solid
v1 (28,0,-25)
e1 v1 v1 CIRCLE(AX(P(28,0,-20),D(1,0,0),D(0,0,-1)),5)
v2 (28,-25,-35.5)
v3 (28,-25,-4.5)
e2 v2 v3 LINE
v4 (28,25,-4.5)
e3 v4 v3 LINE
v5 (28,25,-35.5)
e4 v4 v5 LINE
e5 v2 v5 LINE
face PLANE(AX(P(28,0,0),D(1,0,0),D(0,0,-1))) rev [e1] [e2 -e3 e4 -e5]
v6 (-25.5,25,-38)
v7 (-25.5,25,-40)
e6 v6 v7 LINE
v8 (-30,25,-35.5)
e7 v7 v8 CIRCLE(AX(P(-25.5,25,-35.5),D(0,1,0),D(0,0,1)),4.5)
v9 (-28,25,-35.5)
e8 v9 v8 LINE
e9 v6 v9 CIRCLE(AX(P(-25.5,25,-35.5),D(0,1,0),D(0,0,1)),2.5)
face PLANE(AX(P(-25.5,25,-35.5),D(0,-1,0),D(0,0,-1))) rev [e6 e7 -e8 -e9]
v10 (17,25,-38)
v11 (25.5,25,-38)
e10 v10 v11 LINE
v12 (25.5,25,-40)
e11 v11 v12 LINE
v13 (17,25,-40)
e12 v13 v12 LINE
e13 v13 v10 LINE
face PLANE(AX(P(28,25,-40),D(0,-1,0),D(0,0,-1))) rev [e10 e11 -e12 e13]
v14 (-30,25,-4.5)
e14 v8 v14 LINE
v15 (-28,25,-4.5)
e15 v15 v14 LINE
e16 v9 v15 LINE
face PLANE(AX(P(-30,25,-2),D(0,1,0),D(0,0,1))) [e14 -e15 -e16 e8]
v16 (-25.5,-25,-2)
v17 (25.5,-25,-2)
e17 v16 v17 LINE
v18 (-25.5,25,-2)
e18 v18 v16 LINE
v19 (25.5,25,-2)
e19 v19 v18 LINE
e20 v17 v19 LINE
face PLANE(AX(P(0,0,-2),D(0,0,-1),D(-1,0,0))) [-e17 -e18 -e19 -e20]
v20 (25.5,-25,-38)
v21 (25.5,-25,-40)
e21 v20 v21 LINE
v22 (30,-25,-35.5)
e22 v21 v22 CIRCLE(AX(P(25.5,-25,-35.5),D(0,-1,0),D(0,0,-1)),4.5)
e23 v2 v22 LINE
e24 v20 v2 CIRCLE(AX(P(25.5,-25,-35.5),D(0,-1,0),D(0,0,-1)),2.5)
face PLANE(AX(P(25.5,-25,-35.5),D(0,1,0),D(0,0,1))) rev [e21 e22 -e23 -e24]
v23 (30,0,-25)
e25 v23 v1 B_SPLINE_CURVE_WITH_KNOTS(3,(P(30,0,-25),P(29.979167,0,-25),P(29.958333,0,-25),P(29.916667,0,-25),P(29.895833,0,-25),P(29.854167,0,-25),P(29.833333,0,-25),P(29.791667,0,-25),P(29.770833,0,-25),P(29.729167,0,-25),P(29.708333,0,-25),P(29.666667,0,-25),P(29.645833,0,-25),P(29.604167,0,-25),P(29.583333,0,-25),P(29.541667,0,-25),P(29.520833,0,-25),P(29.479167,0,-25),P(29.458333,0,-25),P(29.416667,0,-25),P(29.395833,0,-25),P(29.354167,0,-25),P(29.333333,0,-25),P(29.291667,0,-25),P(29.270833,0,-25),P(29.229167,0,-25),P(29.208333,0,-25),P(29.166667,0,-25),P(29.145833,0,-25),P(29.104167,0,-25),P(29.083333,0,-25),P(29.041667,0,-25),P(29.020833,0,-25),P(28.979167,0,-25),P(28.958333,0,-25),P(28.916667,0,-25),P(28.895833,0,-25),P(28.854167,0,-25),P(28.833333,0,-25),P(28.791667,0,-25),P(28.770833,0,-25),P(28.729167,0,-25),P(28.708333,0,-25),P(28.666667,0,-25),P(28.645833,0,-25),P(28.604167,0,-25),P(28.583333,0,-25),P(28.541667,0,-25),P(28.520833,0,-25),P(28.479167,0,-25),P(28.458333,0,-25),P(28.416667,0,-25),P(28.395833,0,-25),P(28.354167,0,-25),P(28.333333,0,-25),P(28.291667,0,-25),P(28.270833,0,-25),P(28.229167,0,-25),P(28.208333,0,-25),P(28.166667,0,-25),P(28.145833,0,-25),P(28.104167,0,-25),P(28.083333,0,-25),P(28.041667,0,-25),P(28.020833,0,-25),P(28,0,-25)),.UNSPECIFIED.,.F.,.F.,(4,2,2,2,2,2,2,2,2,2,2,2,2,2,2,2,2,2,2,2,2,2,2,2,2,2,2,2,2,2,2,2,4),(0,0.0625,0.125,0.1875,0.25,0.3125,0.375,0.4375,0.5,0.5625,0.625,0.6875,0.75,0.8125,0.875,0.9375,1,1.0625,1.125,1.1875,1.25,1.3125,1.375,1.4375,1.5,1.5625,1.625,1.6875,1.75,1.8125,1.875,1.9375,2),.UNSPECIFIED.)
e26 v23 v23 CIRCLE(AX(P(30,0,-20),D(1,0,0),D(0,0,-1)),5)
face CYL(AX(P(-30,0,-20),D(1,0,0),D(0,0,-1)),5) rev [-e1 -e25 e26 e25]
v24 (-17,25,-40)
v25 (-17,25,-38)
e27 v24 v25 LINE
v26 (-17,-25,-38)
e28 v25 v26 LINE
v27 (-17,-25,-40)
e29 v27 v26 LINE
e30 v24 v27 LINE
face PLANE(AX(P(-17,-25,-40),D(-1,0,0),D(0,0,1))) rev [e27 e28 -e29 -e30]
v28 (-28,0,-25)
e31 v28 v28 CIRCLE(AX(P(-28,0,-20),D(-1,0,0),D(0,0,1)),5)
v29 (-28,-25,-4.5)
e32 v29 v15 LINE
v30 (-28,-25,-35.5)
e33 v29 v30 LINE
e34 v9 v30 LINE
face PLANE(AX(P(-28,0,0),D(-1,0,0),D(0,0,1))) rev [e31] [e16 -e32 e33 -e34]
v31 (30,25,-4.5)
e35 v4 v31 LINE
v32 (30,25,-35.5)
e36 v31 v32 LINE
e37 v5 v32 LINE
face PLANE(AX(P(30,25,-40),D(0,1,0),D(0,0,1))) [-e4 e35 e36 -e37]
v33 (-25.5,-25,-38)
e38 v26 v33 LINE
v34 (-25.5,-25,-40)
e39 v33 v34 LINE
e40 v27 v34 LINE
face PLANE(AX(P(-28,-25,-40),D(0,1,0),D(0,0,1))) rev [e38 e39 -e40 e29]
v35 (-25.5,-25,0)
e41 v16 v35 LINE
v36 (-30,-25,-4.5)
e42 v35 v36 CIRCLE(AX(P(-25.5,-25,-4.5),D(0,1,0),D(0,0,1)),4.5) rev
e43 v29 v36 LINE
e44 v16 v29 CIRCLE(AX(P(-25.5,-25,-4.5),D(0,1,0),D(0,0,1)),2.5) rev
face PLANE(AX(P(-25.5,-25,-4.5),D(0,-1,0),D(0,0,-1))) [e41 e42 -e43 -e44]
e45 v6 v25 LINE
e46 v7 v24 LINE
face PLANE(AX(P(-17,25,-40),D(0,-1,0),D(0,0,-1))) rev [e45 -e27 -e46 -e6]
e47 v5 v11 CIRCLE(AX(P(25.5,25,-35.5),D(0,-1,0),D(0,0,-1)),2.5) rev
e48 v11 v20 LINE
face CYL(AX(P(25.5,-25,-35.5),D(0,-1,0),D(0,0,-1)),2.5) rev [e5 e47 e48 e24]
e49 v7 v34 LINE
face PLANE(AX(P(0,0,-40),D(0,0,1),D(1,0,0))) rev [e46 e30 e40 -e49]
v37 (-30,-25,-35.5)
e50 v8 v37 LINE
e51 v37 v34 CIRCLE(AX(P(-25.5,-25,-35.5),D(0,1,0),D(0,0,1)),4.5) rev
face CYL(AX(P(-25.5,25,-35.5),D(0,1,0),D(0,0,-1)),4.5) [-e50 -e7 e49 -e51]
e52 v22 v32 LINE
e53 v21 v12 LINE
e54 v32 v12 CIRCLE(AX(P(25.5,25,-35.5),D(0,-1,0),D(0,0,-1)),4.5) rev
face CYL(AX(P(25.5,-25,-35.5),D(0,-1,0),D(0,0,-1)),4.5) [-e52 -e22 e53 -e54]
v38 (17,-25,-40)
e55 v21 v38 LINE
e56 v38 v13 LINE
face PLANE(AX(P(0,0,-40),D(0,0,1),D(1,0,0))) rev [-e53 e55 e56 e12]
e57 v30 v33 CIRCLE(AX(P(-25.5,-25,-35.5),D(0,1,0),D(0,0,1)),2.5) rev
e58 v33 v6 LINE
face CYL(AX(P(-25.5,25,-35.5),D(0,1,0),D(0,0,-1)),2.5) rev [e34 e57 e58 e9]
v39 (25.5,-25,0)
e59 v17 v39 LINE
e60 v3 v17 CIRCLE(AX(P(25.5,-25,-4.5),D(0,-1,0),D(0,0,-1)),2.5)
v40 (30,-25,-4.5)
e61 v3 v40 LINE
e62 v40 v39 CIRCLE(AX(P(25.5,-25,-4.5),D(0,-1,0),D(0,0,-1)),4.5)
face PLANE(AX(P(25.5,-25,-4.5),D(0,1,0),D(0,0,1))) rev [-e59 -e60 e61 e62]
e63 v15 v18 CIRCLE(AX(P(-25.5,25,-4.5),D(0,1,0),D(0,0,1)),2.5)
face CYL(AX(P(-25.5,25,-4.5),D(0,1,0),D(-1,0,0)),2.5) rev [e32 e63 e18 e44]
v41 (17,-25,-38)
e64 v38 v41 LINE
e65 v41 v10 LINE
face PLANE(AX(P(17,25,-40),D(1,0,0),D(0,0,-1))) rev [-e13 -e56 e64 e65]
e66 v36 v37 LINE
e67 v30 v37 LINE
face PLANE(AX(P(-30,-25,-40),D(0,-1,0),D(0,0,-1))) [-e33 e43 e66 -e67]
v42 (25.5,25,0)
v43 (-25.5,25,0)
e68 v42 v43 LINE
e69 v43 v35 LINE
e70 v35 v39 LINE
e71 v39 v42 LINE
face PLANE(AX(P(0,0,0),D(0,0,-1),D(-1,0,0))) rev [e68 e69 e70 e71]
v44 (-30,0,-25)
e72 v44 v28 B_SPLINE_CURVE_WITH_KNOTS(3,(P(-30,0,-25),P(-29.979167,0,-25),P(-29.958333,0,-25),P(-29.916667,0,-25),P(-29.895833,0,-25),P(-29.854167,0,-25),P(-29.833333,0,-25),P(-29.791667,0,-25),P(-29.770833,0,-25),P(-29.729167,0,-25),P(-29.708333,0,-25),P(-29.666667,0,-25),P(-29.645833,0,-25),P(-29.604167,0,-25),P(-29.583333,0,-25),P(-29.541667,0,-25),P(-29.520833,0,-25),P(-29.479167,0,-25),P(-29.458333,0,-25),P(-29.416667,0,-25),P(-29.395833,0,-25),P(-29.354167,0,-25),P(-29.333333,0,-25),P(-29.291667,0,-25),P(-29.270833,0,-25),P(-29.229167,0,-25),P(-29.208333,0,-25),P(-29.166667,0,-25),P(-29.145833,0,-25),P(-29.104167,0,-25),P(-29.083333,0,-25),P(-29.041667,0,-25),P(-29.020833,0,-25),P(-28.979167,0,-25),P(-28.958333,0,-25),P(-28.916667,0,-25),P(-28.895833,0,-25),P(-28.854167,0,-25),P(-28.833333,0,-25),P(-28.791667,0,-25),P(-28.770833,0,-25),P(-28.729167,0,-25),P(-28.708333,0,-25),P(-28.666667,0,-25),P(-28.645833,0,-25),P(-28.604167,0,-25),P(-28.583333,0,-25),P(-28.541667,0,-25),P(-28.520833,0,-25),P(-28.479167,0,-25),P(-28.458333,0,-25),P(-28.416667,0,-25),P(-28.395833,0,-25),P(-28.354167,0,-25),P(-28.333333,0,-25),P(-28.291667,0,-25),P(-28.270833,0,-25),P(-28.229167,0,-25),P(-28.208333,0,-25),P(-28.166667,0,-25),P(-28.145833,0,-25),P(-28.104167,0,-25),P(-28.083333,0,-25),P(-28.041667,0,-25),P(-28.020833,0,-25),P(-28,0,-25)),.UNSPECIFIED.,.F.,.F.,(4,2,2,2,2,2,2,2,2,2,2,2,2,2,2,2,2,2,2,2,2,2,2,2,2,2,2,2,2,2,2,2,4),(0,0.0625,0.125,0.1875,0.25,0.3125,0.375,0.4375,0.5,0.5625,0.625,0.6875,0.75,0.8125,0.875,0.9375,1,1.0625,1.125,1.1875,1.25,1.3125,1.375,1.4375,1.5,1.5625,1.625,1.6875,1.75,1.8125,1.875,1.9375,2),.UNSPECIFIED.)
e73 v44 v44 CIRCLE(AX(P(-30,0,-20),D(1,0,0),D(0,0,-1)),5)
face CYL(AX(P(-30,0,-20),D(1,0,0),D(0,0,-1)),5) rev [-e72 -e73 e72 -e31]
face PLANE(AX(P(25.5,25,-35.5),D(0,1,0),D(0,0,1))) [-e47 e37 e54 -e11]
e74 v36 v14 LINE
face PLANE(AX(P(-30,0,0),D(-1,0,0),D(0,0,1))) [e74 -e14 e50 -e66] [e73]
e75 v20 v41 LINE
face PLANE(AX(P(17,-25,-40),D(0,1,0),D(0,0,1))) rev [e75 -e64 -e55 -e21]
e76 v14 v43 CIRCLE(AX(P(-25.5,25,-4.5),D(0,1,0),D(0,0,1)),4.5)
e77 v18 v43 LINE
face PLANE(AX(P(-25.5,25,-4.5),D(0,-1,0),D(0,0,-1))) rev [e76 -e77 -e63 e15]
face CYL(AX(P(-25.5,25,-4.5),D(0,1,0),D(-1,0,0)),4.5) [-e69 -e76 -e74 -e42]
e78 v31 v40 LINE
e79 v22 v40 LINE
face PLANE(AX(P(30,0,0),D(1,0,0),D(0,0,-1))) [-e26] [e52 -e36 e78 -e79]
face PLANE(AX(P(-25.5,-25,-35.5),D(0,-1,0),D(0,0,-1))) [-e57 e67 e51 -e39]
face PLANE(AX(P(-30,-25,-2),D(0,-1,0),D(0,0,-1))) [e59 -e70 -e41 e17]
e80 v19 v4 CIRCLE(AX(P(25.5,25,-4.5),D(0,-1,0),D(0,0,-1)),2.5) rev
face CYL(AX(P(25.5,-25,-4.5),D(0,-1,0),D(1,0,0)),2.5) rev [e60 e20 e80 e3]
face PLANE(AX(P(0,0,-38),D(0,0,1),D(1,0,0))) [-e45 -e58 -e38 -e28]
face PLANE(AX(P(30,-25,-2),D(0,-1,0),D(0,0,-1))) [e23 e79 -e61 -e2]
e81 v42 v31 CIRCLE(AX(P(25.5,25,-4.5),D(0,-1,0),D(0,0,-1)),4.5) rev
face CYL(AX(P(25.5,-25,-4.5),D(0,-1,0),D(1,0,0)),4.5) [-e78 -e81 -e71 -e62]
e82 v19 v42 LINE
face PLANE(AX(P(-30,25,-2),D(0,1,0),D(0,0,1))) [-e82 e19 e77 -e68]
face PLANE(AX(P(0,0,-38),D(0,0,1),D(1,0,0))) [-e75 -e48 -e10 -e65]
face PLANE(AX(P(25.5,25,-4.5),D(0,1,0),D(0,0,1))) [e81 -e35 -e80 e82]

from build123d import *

# Parameters (mm, degrees)
SKETCH1_W                      = 60
SKETCH1_H                      = 50
BASE_FLANGE1_DEPTH             = 2
EDGE_FLANGE1_STRIP_W           = 13
EDGE_FLANGE1_STRIP_H           = 2
EDGE_FLANGE1_STRIP_CUT_DEPTH   = 50
EDGE_FLANGE1_STRIP_2_W         = 13
EDGE_FLANGE1_STRIP_2_H         = 2
EDGE_FLANGE1_STRIP_CUT_2_DEPTH = 50
EDGE_FLANGE1_DEPTH             = 50
EDGE_FLANGE1_BEND_DEPTH        = 50
EDGE_FLANGE2_STRIP_W           = 13
EDGE_FLANGE2_STRIP_H           = 2
EDGE_FLANGE2_STRIP_CUT_DEPTH   = 50
EDGE_FLANGE2_STRIP_2_W         = 13
EDGE_FLANGE2_STRIP_2_H         = 2
EDGE_FLANGE2_STRIP_CUT_2_DEPTH = 50
EDGE_FLANGE2_DEPTH             = 50
EDGE_FLANGE2_BEND_DEPTH        = 50
SKETCH20_R                     = 5
CUT_EXTRUDE2_DEPTH             = 77.321687612


# Sheet-metal steps are written as plain solids
with BuildPart() as part:
    # Sketch1 → Base-Flange1 (new body)
    with BuildSketch(Plane.XY):
        Rectangle(SKETCH1_W, SKETCH1_H)
    extrude(amount=-BASE_FLANGE1_DEPTH)

    # Edge-Flange1 strip (across the edge) → Edge-Flange1 strip cut (cut)
    with BuildSketch(Plane(origin=(30, 25, -2), x_dir=(-1, 0, 0), z_dir=(0, -1, 0))):
        with Locations((-2, -1)):
            Rectangle(EDGE_FLANGE1_STRIP_W, EDGE_FLANGE1_STRIP_H)
    extrude(amount=EDGE_FLANGE1_STRIP_CUT_DEPTH, mode=Mode.SUBTRACT)

    # Edge-Flange1 strip 2 (across the edge) → Edge-Flange1 strip cut 2 (cut)
    with BuildSketch(Plane(origin=(-30, -25, -2), x_dir=(1, 0, 0), z_dir=(0, 1, 0))):
        with Locations((-2, -1)):
            Rectangle(EDGE_FLANGE1_STRIP_2_W, EDGE_FLANGE1_STRIP_2_H)
    extrude(amount=EDGE_FLANGE1_STRIP_CUT_2_DEPTH, mode=Mode.SUBTRACT)

    # Edge-Flange1 section (across the edge) → Edge-Flange1 (add)
    with BuildSketch(Plane(origin=(30, 25, -2), x_dir=(-1, 0, 0), z_dir=(0, -1, 0))):
        with BuildLine():
            Line((0, 2.5), (0, 38))
            Line((0, 38), (2, 38))
            Line((2, 38), (2, 2.5))
            ThreePointArc((2, 2.5), (2.732233047, 0.732233047), (4.5, 0))
            Line((4.5, 0), (4.5, -2))
            ThreePointArc((4.5, -2), (1.318019485, -0.681980515), (0, 2.5))
        make_face()
    extrude(amount=EDGE_FLANGE1_DEPTH)

    # Edge-Flange1 section 2 (across the edge) → Edge-Flange1 bend (add)
    with BuildSketch(Plane(origin=(-30, -25, -2), x_dir=(1, 0, 0), z_dir=(0, 1, 0))):
        with BuildLine():
            Line((0, 2.5), (0, 38))
            Line((0, 38), (2, 38))
            Line((2, 38), (2, 2.5))
            ThreePointArc((2, 2.5), (2.732233047, 0.732233047), (4.5, 0))
            Line((4.5, 0), (4.5, -2))
            ThreePointArc((4.5, -2), (1.318019485, -0.681980515), (0, 2.5))
        make_face()
    extrude(amount=EDGE_FLANGE1_BEND_DEPTH)

    # Edge-Flange2 strip (across the edge) → Edge-Flange2 strip cut (cut)
    with BuildSketch(Plane(origin=(28, 25, -40), x_dir=(0, 0, 1), z_dir=(0, -1, 0))):
        with Locations((-2, -1)):
            Rectangle(EDGE_FLANGE2_STRIP_W, EDGE_FLANGE2_STRIP_H)
    extrude(amount=EDGE_FLANGE2_STRIP_CUT_DEPTH, mode=Mode.SUBTRACT)

    # Edge-Flange2 strip 2 (across the edge) → Edge-Flange2 strip cut 2 (cut)
    with BuildSketch(Plane(origin=(-28, -25, -40), x_dir=(0, 0, 1), z_dir=(0, 1, 0))):
        with Locations((-2, -1)):
            Rectangle(EDGE_FLANGE2_STRIP_2_W, EDGE_FLANGE2_STRIP_2_H)
    extrude(amount=EDGE_FLANGE2_STRIP_CUT_2_DEPTH, mode=Mode.SUBTRACT)

    # Edge-Flange2 section (across the edge) → Edge-Flange2 (add)
    with BuildSketch(Plane(origin=(28, 25, -40), x_dir=(0, 0, 1), z_dir=(0, -1, 0))):
        with BuildLine():
            Line((0, 2.5), (0, 11))
            Line((0, 11), (2, 11))
            Line((2, 11), (2, 2.5))
            ThreePointArc((2, 2.5), (2.732233047, 0.732233047), (4.5, 0))
            Line((4.5, 0), (4.5, -2))
            ThreePointArc((4.5, -2), (1.318019485, -0.681980515), (0, 2.5))
        make_face()
    extrude(amount=EDGE_FLANGE2_DEPTH)

    # Edge-Flange2 section 2 (across the edge) → Edge-Flange2 bend (add)
    with BuildSketch(Plane(origin=(-28, -25, -40), x_dir=(0, 0, 1), z_dir=(0, 1, 0))):
        with BuildLine():
            Line((0, 2.5), (0, 11))
            Line((0, 11), (2, 11))
            Line((2, 11), (2, 2.5))
            ThreePointArc((2, 2.5), (2.732233047, 0.732233047), (4.5, 0))
            Line((4.5, 0), (4.5, -2))
            ThreePointArc((4.5, -2), (1.318019485, -0.681980515), (0, 2.5))
        make_face()
    extrude(amount=EDGE_FLANGE2_BEND_DEPTH)

    # Sketch20 → Cut-Extrude2 (cut, through all)
    with BuildSketch(Plane(origin=(30, 0, 0), x_dir=(0, 0, -1), z_dir=(1, 0, 0))):
        with Locations((20, 0)):
            Circle(SKETCH20_R)
    extrude(amount=-CUT_EXTRUDE2_DEPTH, mode=Mode.SUBTRACT)


solid = part.part
